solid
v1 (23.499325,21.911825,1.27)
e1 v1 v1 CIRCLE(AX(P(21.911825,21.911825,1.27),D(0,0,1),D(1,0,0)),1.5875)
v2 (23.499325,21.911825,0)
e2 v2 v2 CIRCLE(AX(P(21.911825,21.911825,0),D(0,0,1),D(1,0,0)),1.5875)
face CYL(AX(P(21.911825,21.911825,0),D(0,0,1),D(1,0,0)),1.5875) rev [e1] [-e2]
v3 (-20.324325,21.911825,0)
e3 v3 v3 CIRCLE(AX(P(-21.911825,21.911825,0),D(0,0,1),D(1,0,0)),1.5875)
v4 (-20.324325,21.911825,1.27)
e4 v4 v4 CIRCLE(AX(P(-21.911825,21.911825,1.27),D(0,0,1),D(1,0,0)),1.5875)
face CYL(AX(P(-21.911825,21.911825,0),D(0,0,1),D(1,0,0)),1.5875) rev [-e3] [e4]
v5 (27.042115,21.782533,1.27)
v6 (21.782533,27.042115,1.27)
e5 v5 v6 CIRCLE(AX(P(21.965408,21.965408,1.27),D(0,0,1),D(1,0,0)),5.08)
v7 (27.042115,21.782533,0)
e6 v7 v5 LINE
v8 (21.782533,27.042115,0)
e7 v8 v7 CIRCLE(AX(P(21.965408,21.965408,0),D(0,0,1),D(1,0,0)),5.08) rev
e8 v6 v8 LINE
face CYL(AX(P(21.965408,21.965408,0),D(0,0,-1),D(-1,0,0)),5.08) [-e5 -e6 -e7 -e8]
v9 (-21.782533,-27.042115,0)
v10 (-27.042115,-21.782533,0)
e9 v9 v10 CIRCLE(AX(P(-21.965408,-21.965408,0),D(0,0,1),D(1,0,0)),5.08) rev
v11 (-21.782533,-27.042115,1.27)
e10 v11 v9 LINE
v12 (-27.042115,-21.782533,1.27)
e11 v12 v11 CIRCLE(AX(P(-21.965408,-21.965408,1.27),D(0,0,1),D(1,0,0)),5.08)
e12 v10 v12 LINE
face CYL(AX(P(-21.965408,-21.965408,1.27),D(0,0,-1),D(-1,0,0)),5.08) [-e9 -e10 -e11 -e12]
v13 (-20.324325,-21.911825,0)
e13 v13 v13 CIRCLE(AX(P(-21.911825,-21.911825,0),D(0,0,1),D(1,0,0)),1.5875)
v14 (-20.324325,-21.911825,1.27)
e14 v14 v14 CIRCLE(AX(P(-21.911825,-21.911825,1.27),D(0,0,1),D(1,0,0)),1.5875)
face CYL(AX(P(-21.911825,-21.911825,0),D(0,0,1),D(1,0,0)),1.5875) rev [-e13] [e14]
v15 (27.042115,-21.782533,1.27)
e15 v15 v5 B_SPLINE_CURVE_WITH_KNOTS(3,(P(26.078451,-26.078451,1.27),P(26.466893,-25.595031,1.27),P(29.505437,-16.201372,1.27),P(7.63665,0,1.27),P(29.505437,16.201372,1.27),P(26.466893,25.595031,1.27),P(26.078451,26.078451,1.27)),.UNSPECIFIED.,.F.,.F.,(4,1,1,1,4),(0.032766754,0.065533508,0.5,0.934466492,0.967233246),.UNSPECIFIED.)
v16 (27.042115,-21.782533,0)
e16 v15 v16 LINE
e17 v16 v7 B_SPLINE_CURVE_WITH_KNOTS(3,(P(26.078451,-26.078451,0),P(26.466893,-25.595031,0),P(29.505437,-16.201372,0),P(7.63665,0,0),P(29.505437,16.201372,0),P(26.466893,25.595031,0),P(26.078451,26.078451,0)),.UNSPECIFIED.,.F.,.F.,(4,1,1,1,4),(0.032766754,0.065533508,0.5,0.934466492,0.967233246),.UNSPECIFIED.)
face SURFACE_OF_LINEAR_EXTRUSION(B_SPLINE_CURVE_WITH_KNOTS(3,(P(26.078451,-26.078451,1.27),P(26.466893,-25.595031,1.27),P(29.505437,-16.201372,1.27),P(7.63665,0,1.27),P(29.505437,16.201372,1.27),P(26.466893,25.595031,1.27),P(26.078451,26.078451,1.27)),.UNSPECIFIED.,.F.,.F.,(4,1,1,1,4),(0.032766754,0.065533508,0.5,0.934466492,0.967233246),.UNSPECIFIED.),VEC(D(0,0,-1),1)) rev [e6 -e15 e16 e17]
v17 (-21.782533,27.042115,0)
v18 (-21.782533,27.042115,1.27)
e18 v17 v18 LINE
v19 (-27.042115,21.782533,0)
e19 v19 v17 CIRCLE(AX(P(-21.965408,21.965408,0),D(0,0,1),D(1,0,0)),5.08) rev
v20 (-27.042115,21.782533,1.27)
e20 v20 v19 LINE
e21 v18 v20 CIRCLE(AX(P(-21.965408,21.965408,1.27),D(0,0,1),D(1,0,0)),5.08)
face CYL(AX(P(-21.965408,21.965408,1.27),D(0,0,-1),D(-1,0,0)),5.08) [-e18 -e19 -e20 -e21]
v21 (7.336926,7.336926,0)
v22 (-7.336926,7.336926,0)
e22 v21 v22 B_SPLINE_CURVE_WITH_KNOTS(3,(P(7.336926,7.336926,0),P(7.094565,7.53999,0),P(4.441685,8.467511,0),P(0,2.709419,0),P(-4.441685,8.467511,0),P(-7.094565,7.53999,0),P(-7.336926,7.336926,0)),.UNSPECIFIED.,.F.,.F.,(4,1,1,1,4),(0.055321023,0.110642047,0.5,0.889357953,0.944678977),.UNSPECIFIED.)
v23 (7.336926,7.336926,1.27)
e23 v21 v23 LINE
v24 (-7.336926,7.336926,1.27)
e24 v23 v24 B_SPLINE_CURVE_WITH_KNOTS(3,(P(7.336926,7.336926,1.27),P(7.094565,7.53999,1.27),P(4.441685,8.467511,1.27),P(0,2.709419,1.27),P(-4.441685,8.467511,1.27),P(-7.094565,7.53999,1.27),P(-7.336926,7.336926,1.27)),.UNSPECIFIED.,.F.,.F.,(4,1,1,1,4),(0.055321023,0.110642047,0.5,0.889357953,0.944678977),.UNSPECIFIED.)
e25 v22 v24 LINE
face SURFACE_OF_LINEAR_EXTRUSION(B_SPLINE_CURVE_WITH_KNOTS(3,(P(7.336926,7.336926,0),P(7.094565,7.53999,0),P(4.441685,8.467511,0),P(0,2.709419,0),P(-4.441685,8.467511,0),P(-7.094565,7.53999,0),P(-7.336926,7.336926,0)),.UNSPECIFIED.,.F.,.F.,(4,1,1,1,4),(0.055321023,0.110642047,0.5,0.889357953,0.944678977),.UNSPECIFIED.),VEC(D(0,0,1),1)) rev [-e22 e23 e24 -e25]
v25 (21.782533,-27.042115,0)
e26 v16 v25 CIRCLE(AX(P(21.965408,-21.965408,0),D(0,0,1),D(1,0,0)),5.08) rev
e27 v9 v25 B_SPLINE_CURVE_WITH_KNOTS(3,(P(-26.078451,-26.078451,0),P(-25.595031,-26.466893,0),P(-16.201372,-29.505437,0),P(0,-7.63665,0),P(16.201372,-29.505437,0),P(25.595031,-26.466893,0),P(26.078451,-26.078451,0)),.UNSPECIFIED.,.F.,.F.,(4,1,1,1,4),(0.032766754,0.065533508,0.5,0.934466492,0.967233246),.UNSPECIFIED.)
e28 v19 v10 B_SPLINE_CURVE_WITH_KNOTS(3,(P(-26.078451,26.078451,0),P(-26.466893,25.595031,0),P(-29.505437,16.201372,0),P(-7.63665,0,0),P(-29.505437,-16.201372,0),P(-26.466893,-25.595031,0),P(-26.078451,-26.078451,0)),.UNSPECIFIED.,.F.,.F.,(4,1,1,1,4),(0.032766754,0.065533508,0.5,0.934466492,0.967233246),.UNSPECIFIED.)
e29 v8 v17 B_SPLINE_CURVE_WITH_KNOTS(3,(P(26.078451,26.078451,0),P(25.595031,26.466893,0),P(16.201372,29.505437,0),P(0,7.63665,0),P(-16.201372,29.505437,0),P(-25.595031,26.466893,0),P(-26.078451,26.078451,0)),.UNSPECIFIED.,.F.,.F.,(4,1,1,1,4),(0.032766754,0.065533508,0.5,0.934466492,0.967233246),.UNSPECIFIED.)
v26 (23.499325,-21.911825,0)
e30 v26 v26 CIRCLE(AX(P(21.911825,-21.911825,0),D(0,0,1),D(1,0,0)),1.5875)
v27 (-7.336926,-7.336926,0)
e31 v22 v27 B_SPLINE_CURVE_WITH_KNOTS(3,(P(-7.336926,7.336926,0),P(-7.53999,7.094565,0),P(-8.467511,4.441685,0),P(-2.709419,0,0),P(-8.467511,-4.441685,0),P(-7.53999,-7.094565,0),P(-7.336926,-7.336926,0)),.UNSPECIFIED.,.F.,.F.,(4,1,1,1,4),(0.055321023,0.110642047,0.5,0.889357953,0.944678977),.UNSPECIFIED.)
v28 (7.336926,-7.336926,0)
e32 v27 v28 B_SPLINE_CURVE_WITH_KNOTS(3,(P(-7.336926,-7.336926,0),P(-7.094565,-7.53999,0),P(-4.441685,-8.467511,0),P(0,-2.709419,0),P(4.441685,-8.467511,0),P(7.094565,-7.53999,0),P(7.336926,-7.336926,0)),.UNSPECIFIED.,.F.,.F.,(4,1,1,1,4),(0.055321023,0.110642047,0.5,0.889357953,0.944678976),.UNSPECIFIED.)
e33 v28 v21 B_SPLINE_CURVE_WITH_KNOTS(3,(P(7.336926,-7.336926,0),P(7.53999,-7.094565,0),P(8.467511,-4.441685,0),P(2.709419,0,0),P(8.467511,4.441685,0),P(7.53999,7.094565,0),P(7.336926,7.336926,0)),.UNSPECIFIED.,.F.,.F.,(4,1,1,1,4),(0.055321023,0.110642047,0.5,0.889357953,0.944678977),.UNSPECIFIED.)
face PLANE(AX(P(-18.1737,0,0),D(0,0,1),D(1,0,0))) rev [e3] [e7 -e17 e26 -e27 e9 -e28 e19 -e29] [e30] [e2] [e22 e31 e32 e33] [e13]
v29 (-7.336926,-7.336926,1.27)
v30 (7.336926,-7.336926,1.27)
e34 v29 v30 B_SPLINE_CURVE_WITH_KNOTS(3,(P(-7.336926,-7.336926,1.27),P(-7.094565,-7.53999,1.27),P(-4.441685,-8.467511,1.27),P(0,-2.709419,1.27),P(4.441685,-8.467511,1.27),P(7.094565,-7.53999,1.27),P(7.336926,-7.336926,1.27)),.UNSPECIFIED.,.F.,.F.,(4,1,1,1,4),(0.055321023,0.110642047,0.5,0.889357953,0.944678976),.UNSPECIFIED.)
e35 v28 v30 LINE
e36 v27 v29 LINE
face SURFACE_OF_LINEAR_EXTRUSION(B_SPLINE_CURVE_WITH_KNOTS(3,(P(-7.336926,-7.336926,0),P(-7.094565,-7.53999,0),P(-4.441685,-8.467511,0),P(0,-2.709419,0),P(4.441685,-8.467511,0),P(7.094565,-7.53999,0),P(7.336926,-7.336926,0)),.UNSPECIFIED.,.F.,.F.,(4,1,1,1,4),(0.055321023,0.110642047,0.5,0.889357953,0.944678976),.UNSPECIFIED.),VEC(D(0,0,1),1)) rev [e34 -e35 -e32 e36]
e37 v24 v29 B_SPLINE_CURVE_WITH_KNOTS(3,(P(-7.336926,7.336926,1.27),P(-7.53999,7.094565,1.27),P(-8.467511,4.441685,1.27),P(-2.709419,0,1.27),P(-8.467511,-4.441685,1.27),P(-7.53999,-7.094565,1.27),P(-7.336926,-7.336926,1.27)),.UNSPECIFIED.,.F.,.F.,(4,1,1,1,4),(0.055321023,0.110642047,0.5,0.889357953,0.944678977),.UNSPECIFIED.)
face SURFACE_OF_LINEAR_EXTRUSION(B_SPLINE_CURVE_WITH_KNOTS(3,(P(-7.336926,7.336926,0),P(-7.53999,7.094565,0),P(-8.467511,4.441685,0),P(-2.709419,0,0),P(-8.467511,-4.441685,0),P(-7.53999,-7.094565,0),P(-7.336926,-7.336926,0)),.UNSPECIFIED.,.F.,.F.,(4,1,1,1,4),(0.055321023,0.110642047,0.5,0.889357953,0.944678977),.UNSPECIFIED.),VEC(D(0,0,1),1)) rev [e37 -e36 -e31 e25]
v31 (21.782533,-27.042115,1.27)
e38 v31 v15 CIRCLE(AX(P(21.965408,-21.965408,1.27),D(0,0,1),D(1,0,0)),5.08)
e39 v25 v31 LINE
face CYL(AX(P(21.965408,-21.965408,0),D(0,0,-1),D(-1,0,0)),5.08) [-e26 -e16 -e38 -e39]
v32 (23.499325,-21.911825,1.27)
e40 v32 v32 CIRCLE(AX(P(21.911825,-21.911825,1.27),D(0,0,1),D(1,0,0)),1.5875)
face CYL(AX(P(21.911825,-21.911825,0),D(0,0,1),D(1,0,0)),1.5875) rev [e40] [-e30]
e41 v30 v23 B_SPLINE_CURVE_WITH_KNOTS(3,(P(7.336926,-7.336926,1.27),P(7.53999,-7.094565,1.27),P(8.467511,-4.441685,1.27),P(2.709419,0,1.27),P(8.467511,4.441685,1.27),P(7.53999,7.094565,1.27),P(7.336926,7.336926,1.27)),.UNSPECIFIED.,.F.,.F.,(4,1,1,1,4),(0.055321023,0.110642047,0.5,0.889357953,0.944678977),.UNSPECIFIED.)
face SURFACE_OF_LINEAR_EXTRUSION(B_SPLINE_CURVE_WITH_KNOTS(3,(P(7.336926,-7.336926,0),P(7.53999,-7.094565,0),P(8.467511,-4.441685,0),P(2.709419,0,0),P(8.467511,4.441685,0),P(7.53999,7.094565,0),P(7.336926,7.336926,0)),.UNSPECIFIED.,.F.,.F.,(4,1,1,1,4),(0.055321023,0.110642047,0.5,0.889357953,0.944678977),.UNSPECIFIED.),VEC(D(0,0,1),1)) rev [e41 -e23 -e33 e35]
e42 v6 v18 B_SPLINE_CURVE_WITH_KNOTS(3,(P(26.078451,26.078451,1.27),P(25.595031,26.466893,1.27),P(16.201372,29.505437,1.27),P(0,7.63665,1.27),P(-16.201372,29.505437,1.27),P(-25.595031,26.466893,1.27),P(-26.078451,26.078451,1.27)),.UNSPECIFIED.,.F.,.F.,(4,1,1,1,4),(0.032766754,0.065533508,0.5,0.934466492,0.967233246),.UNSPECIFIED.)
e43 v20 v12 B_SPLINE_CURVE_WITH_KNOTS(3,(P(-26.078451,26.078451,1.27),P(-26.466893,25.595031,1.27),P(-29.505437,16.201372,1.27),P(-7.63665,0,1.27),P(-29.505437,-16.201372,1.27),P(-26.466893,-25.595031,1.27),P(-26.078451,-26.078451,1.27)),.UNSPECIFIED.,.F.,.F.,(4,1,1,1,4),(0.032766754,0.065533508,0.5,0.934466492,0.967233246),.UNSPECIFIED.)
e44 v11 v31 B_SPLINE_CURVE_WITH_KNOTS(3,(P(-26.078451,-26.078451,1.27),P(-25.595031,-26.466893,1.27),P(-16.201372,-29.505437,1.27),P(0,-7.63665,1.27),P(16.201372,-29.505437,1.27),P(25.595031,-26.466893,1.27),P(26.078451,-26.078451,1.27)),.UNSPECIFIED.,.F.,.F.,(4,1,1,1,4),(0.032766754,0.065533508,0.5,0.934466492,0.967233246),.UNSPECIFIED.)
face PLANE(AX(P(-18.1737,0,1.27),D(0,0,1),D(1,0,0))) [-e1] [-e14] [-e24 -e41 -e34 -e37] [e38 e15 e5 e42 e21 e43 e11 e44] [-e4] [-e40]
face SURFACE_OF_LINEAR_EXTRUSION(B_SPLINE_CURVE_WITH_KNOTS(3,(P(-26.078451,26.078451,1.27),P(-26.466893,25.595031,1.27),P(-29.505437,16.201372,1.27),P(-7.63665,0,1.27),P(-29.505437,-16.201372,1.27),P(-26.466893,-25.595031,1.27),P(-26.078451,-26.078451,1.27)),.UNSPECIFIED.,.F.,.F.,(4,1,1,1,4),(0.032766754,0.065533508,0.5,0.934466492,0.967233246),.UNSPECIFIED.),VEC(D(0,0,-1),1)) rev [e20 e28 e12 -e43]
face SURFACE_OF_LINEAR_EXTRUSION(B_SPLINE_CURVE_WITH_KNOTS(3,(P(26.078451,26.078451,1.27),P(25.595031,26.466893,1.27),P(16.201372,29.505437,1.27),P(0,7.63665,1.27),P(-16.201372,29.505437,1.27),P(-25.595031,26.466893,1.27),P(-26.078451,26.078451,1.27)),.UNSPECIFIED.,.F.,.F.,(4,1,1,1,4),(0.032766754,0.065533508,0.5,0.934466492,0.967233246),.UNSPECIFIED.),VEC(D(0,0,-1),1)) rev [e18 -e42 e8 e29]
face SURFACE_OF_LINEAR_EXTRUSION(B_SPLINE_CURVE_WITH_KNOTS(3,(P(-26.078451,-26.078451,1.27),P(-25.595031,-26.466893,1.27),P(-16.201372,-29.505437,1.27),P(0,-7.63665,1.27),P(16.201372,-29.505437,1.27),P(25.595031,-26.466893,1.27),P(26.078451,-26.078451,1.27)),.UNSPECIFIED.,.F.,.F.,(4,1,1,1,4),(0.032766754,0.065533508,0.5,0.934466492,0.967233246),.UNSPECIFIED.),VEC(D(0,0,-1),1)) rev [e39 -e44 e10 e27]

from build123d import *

# Parameters (mm, degrees)
BOSS_EXTRUDE1_DEPTH = 1.27
FILLET1_START       = -1
FILLET1_DEPTH       = 3
FILLET2_START       = -1
FILLET2_DEPTH       = 3
FILLET3_R           = 5.08
FILLET4_R           = 5.08
SKETCH3_R           = 1.5875
CUT_EXTRUDE1_DEPTH  = 39.269062151


with BuildPart() as part:
    # Sketch1 → Boss-Extrude1 (new body)
    with BuildSketch(Plane.XY):
        with BuildLine():
            add(Edge.make_bspline(
                [(-26.078451224, -26.078451224), (-25.595030672, -26.46689269), (-16.201372292, -29.50543677), (0, -7.636650328), (16.201372291, -29.50543677), (25.595030672, -26.46689269), (26.078451224, -26.078451224)],
                knots=[0.032766754, 0.032766754, 0.032766754, 0.032766754, 0.065533508, 0.5, 0.934466492, 0.967233246, 0.967233246, 0.967233246, 0.967233246], degree=3))
            add(Edge.make_bspline(
                [(26.078451224, -26.078451224), (26.46689269, -25.595030672), (29.505436772, -16.201372289), (7.636650328, -2e-09), (29.505436768, 16.201372294), (26.46689269, 25.595030672), (26.078451224, 26.078451224)],
                knots=[0.032766754, 0.032766754, 0.032766754, 0.032766754, 0.065533508, 0.5, 0.934466492, 0.967233246, 0.967233246, 0.967233246, 0.967233246], degree=3))
            add(Edge.make_bspline(
                [(-26.078451224, 26.078451224), (-25.595030672, 26.46689269), (-16.201372292, 29.50543677), (0, 7.636650328), (16.201372291, 29.50543677), (25.595030672, 26.46689269), (26.078451224, 26.078451224)],
                knots=[0.032766754, 0.032766754, 0.032766754, 0.032766754, 0.065533508, 0.5, 0.934466492, 0.967233246, 0.967233246, 0.967233246, 0.967233246], degree=3))
            add(Edge.make_bspline(
                [(-26.078451224, -26.078451224), (-26.46689269, -25.595030672), (-29.50543677, -16.201372292), (-7.636650328, 0), (-29.50543677, 16.201372291), (-26.46689269, 25.595030672), (-26.078451224, 26.078451224)],
                knots=[0.032766754, 0.032766754, 0.032766754, 0.032766754, 0.065533508, 0.5, 0.934466492, 0.967233246, 0.967233246, 0.967233246, 0.967233246], degree=3))
        make_face()
    extrude(amount=BOSS_EXTRUDE1_DEPTH)

    # Fillet1: read off the stored shape, not the designer's step
    # Fillet1 outline → Fillet1 (cut)
    with BuildSketch(Plane.XY.offset(FILLET1_START)):
        with BuildLine():
            add(Edge.make_bspline(
                [(26.078451224, 26.078451224), (25.595030672, 26.46689269), (24.088787806, 26.954113447), (22.608220096, 27.071858625), (21.782533291, 27.042115453)],
                knots=[0.032766754, 0.032766754, 0.032766754, 0.032766754, 0.065533508, 0.1076861, 0.1076861, 0.1076861, 0.1076861], degree=3))
            ThreePointArc((21.782533291, 27.042115453), (25.557510624, 25.557510623), (27.042115452, 21.78253329))
            add(Edge.make_bspline(
                [(27.042115452, 21.78253329), (27.071858625, 22.608220095), (26.954113447, 24.088787806), (26.46689269, 25.595030672), (26.078451224, 26.078451224)],
                knots=[0.8923139, 0.8923139, 0.8923139, 0.8923139, 0.934466492, 0.967233246, 0.967233246, 0.967233246, 0.967233246], degree=3))
        make_face()
    extrude(amount=FILLET1_DEPTH, mode=Mode.SUBTRACT)

    # Fillet2: read off the stored shape, not the designer's step
    # Fillet2 outline → Fillet2 (cut)
    with BuildSketch(Plane.XY.offset(FILLET2_START)):
        with BuildLine():
            add(Edge.make_bspline(
                [(-26.078451224, -26.078451224), (-25.595030672, -26.46689269), (-24.088787806, -26.954113447), (-22.608220096, -27.071858625), (-21.782533291, -27.042115453)],
                knots=[0.032766754, 0.032766754, 0.032766754, 0.032766754, 0.065533508, 0.1076861, 0.1076861, 0.1076861, 0.1076861], degree=3))
            ThreePointArc((-21.782533291, -27.042115453), (-25.557510624, -25.557510624), (-27.042115453, -21.782533291))
            add(Edge.make_bspline(
                [(-27.042115453, -21.782533291), (-27.071858625, -22.608220096), (-26.954113447, -24.088787806), (-26.46689269, -25.595030672), (-26.078451224, -26.078451224)],
                knots=[0.8923139, 0.8923139, 0.8923139, 0.8923139, 0.934466492, 0.967233246, 0.967233246, 0.967233246, 0.967233246], degree=3))
        make_face()
    extrude(amount=FILLET2_DEPTH, mode=Mode.SUBTRACT)

    # Fillet3
    fillet3_edges = [part.edges().sort_by_distance(p)[0] for p in [
        (-26.078451224, 26.078451224, 0.635),
    ]]
    fillet(fillet3_edges, radius=FILLET3_R)

    # Fillet4
    fillet4_edges = [part.edges().sort_by_distance(p)[0] for p in [
        (26.078451224, -26.078451224, 0.635),
    ]]
    fillet(fillet4_edges, radius=FILLET4_R)

    # Sketch3 → Cut-Extrude1 (cut, through all)
    with BuildSketch(Plane.XY.offset(1.27)):
        with Locations((-21.911824935, 21.911824935)):
            Circle(SKETCH3_R)
        with Locations((21.911824935, 21.911824935)):
            Circle(SKETCH3_R)
        with Locations((21.911824935, -21.911824935)):
            Circle(SKETCH3_R)
        with Locations((-21.911824935, -21.911824935)):
            Circle(SKETCH3_R)
        with BuildLine():
            add(Edge.make_bspline(
                [(-7.336925612, -7.336925612), (-7.094564954, -7.539990493), (-4.441685448, -8.467510629), (0, -2.70941912), (4.441685448, -8.467510629), (7.094564954, -7.539990493), (7.336925612, -7.336925612)],
                knots=[0.055321023, 0.055321023, 0.055321023, 0.055321023, 0.110642047, 0.5, 0.889357953, 0.944678976, 0.944678976, 0.944678976, 0.944678976], degree=3))
            add(Edge.make_bspline(
                [(7.336925612, 7.336925612), (7.539990493, 7.094564954), (8.467510629, 4.441685448), (2.70941912, 0), (8.467510629, -4.441685448), (7.539990493, -7.094564954), (7.336925612, -7.336925612)],
                knots=[0.055321023, 0.055321023, 0.055321023, 0.055321023, 0.110642047, 0.5, 0.889357953, 0.944678977, 0.944678977, 0.944678977, 0.944678977], degree=3))
            add(Edge.make_bspline(
                [(-7.336925612, 7.336925612), (-7.094564954, 7.539990493), (-4.441685448, 8.467510629), (0, 2.70941912), (4.441685448, 8.467510629), (7.094564954, 7.539990493), (7.336925612, 7.336925612)],
                knots=[0.055321023, 0.055321023, 0.055321023, 0.055321023, 0.110642047, 0.5, 0.889357953, 0.944678977, 0.944678977, 0.944678977, 0.944678977], degree=3))
            add(Edge.make_bspline(
                [(-7.336925612, 7.336925612), (-7.539990493, 7.094564954), (-8.467510629, 4.441685448), (-2.70941912, 0), (-8.467510629, -4.441685448), (-7.539990493, -7.094564954), (-7.336925612, -7.336925612)],
                knots=[0.055321023, 0.055321023, 0.055321023, 0.055321023, 0.110642047, 0.5, 0.889357953, 0.944678977, 0.944678977, 0.944678977, 0.944678977], degree=3))
        make_face()
    extrude(amount=-CUT_EXTRUDE1_DEPTH, mode=Mode.SUBTRACT)


solid = part.part
